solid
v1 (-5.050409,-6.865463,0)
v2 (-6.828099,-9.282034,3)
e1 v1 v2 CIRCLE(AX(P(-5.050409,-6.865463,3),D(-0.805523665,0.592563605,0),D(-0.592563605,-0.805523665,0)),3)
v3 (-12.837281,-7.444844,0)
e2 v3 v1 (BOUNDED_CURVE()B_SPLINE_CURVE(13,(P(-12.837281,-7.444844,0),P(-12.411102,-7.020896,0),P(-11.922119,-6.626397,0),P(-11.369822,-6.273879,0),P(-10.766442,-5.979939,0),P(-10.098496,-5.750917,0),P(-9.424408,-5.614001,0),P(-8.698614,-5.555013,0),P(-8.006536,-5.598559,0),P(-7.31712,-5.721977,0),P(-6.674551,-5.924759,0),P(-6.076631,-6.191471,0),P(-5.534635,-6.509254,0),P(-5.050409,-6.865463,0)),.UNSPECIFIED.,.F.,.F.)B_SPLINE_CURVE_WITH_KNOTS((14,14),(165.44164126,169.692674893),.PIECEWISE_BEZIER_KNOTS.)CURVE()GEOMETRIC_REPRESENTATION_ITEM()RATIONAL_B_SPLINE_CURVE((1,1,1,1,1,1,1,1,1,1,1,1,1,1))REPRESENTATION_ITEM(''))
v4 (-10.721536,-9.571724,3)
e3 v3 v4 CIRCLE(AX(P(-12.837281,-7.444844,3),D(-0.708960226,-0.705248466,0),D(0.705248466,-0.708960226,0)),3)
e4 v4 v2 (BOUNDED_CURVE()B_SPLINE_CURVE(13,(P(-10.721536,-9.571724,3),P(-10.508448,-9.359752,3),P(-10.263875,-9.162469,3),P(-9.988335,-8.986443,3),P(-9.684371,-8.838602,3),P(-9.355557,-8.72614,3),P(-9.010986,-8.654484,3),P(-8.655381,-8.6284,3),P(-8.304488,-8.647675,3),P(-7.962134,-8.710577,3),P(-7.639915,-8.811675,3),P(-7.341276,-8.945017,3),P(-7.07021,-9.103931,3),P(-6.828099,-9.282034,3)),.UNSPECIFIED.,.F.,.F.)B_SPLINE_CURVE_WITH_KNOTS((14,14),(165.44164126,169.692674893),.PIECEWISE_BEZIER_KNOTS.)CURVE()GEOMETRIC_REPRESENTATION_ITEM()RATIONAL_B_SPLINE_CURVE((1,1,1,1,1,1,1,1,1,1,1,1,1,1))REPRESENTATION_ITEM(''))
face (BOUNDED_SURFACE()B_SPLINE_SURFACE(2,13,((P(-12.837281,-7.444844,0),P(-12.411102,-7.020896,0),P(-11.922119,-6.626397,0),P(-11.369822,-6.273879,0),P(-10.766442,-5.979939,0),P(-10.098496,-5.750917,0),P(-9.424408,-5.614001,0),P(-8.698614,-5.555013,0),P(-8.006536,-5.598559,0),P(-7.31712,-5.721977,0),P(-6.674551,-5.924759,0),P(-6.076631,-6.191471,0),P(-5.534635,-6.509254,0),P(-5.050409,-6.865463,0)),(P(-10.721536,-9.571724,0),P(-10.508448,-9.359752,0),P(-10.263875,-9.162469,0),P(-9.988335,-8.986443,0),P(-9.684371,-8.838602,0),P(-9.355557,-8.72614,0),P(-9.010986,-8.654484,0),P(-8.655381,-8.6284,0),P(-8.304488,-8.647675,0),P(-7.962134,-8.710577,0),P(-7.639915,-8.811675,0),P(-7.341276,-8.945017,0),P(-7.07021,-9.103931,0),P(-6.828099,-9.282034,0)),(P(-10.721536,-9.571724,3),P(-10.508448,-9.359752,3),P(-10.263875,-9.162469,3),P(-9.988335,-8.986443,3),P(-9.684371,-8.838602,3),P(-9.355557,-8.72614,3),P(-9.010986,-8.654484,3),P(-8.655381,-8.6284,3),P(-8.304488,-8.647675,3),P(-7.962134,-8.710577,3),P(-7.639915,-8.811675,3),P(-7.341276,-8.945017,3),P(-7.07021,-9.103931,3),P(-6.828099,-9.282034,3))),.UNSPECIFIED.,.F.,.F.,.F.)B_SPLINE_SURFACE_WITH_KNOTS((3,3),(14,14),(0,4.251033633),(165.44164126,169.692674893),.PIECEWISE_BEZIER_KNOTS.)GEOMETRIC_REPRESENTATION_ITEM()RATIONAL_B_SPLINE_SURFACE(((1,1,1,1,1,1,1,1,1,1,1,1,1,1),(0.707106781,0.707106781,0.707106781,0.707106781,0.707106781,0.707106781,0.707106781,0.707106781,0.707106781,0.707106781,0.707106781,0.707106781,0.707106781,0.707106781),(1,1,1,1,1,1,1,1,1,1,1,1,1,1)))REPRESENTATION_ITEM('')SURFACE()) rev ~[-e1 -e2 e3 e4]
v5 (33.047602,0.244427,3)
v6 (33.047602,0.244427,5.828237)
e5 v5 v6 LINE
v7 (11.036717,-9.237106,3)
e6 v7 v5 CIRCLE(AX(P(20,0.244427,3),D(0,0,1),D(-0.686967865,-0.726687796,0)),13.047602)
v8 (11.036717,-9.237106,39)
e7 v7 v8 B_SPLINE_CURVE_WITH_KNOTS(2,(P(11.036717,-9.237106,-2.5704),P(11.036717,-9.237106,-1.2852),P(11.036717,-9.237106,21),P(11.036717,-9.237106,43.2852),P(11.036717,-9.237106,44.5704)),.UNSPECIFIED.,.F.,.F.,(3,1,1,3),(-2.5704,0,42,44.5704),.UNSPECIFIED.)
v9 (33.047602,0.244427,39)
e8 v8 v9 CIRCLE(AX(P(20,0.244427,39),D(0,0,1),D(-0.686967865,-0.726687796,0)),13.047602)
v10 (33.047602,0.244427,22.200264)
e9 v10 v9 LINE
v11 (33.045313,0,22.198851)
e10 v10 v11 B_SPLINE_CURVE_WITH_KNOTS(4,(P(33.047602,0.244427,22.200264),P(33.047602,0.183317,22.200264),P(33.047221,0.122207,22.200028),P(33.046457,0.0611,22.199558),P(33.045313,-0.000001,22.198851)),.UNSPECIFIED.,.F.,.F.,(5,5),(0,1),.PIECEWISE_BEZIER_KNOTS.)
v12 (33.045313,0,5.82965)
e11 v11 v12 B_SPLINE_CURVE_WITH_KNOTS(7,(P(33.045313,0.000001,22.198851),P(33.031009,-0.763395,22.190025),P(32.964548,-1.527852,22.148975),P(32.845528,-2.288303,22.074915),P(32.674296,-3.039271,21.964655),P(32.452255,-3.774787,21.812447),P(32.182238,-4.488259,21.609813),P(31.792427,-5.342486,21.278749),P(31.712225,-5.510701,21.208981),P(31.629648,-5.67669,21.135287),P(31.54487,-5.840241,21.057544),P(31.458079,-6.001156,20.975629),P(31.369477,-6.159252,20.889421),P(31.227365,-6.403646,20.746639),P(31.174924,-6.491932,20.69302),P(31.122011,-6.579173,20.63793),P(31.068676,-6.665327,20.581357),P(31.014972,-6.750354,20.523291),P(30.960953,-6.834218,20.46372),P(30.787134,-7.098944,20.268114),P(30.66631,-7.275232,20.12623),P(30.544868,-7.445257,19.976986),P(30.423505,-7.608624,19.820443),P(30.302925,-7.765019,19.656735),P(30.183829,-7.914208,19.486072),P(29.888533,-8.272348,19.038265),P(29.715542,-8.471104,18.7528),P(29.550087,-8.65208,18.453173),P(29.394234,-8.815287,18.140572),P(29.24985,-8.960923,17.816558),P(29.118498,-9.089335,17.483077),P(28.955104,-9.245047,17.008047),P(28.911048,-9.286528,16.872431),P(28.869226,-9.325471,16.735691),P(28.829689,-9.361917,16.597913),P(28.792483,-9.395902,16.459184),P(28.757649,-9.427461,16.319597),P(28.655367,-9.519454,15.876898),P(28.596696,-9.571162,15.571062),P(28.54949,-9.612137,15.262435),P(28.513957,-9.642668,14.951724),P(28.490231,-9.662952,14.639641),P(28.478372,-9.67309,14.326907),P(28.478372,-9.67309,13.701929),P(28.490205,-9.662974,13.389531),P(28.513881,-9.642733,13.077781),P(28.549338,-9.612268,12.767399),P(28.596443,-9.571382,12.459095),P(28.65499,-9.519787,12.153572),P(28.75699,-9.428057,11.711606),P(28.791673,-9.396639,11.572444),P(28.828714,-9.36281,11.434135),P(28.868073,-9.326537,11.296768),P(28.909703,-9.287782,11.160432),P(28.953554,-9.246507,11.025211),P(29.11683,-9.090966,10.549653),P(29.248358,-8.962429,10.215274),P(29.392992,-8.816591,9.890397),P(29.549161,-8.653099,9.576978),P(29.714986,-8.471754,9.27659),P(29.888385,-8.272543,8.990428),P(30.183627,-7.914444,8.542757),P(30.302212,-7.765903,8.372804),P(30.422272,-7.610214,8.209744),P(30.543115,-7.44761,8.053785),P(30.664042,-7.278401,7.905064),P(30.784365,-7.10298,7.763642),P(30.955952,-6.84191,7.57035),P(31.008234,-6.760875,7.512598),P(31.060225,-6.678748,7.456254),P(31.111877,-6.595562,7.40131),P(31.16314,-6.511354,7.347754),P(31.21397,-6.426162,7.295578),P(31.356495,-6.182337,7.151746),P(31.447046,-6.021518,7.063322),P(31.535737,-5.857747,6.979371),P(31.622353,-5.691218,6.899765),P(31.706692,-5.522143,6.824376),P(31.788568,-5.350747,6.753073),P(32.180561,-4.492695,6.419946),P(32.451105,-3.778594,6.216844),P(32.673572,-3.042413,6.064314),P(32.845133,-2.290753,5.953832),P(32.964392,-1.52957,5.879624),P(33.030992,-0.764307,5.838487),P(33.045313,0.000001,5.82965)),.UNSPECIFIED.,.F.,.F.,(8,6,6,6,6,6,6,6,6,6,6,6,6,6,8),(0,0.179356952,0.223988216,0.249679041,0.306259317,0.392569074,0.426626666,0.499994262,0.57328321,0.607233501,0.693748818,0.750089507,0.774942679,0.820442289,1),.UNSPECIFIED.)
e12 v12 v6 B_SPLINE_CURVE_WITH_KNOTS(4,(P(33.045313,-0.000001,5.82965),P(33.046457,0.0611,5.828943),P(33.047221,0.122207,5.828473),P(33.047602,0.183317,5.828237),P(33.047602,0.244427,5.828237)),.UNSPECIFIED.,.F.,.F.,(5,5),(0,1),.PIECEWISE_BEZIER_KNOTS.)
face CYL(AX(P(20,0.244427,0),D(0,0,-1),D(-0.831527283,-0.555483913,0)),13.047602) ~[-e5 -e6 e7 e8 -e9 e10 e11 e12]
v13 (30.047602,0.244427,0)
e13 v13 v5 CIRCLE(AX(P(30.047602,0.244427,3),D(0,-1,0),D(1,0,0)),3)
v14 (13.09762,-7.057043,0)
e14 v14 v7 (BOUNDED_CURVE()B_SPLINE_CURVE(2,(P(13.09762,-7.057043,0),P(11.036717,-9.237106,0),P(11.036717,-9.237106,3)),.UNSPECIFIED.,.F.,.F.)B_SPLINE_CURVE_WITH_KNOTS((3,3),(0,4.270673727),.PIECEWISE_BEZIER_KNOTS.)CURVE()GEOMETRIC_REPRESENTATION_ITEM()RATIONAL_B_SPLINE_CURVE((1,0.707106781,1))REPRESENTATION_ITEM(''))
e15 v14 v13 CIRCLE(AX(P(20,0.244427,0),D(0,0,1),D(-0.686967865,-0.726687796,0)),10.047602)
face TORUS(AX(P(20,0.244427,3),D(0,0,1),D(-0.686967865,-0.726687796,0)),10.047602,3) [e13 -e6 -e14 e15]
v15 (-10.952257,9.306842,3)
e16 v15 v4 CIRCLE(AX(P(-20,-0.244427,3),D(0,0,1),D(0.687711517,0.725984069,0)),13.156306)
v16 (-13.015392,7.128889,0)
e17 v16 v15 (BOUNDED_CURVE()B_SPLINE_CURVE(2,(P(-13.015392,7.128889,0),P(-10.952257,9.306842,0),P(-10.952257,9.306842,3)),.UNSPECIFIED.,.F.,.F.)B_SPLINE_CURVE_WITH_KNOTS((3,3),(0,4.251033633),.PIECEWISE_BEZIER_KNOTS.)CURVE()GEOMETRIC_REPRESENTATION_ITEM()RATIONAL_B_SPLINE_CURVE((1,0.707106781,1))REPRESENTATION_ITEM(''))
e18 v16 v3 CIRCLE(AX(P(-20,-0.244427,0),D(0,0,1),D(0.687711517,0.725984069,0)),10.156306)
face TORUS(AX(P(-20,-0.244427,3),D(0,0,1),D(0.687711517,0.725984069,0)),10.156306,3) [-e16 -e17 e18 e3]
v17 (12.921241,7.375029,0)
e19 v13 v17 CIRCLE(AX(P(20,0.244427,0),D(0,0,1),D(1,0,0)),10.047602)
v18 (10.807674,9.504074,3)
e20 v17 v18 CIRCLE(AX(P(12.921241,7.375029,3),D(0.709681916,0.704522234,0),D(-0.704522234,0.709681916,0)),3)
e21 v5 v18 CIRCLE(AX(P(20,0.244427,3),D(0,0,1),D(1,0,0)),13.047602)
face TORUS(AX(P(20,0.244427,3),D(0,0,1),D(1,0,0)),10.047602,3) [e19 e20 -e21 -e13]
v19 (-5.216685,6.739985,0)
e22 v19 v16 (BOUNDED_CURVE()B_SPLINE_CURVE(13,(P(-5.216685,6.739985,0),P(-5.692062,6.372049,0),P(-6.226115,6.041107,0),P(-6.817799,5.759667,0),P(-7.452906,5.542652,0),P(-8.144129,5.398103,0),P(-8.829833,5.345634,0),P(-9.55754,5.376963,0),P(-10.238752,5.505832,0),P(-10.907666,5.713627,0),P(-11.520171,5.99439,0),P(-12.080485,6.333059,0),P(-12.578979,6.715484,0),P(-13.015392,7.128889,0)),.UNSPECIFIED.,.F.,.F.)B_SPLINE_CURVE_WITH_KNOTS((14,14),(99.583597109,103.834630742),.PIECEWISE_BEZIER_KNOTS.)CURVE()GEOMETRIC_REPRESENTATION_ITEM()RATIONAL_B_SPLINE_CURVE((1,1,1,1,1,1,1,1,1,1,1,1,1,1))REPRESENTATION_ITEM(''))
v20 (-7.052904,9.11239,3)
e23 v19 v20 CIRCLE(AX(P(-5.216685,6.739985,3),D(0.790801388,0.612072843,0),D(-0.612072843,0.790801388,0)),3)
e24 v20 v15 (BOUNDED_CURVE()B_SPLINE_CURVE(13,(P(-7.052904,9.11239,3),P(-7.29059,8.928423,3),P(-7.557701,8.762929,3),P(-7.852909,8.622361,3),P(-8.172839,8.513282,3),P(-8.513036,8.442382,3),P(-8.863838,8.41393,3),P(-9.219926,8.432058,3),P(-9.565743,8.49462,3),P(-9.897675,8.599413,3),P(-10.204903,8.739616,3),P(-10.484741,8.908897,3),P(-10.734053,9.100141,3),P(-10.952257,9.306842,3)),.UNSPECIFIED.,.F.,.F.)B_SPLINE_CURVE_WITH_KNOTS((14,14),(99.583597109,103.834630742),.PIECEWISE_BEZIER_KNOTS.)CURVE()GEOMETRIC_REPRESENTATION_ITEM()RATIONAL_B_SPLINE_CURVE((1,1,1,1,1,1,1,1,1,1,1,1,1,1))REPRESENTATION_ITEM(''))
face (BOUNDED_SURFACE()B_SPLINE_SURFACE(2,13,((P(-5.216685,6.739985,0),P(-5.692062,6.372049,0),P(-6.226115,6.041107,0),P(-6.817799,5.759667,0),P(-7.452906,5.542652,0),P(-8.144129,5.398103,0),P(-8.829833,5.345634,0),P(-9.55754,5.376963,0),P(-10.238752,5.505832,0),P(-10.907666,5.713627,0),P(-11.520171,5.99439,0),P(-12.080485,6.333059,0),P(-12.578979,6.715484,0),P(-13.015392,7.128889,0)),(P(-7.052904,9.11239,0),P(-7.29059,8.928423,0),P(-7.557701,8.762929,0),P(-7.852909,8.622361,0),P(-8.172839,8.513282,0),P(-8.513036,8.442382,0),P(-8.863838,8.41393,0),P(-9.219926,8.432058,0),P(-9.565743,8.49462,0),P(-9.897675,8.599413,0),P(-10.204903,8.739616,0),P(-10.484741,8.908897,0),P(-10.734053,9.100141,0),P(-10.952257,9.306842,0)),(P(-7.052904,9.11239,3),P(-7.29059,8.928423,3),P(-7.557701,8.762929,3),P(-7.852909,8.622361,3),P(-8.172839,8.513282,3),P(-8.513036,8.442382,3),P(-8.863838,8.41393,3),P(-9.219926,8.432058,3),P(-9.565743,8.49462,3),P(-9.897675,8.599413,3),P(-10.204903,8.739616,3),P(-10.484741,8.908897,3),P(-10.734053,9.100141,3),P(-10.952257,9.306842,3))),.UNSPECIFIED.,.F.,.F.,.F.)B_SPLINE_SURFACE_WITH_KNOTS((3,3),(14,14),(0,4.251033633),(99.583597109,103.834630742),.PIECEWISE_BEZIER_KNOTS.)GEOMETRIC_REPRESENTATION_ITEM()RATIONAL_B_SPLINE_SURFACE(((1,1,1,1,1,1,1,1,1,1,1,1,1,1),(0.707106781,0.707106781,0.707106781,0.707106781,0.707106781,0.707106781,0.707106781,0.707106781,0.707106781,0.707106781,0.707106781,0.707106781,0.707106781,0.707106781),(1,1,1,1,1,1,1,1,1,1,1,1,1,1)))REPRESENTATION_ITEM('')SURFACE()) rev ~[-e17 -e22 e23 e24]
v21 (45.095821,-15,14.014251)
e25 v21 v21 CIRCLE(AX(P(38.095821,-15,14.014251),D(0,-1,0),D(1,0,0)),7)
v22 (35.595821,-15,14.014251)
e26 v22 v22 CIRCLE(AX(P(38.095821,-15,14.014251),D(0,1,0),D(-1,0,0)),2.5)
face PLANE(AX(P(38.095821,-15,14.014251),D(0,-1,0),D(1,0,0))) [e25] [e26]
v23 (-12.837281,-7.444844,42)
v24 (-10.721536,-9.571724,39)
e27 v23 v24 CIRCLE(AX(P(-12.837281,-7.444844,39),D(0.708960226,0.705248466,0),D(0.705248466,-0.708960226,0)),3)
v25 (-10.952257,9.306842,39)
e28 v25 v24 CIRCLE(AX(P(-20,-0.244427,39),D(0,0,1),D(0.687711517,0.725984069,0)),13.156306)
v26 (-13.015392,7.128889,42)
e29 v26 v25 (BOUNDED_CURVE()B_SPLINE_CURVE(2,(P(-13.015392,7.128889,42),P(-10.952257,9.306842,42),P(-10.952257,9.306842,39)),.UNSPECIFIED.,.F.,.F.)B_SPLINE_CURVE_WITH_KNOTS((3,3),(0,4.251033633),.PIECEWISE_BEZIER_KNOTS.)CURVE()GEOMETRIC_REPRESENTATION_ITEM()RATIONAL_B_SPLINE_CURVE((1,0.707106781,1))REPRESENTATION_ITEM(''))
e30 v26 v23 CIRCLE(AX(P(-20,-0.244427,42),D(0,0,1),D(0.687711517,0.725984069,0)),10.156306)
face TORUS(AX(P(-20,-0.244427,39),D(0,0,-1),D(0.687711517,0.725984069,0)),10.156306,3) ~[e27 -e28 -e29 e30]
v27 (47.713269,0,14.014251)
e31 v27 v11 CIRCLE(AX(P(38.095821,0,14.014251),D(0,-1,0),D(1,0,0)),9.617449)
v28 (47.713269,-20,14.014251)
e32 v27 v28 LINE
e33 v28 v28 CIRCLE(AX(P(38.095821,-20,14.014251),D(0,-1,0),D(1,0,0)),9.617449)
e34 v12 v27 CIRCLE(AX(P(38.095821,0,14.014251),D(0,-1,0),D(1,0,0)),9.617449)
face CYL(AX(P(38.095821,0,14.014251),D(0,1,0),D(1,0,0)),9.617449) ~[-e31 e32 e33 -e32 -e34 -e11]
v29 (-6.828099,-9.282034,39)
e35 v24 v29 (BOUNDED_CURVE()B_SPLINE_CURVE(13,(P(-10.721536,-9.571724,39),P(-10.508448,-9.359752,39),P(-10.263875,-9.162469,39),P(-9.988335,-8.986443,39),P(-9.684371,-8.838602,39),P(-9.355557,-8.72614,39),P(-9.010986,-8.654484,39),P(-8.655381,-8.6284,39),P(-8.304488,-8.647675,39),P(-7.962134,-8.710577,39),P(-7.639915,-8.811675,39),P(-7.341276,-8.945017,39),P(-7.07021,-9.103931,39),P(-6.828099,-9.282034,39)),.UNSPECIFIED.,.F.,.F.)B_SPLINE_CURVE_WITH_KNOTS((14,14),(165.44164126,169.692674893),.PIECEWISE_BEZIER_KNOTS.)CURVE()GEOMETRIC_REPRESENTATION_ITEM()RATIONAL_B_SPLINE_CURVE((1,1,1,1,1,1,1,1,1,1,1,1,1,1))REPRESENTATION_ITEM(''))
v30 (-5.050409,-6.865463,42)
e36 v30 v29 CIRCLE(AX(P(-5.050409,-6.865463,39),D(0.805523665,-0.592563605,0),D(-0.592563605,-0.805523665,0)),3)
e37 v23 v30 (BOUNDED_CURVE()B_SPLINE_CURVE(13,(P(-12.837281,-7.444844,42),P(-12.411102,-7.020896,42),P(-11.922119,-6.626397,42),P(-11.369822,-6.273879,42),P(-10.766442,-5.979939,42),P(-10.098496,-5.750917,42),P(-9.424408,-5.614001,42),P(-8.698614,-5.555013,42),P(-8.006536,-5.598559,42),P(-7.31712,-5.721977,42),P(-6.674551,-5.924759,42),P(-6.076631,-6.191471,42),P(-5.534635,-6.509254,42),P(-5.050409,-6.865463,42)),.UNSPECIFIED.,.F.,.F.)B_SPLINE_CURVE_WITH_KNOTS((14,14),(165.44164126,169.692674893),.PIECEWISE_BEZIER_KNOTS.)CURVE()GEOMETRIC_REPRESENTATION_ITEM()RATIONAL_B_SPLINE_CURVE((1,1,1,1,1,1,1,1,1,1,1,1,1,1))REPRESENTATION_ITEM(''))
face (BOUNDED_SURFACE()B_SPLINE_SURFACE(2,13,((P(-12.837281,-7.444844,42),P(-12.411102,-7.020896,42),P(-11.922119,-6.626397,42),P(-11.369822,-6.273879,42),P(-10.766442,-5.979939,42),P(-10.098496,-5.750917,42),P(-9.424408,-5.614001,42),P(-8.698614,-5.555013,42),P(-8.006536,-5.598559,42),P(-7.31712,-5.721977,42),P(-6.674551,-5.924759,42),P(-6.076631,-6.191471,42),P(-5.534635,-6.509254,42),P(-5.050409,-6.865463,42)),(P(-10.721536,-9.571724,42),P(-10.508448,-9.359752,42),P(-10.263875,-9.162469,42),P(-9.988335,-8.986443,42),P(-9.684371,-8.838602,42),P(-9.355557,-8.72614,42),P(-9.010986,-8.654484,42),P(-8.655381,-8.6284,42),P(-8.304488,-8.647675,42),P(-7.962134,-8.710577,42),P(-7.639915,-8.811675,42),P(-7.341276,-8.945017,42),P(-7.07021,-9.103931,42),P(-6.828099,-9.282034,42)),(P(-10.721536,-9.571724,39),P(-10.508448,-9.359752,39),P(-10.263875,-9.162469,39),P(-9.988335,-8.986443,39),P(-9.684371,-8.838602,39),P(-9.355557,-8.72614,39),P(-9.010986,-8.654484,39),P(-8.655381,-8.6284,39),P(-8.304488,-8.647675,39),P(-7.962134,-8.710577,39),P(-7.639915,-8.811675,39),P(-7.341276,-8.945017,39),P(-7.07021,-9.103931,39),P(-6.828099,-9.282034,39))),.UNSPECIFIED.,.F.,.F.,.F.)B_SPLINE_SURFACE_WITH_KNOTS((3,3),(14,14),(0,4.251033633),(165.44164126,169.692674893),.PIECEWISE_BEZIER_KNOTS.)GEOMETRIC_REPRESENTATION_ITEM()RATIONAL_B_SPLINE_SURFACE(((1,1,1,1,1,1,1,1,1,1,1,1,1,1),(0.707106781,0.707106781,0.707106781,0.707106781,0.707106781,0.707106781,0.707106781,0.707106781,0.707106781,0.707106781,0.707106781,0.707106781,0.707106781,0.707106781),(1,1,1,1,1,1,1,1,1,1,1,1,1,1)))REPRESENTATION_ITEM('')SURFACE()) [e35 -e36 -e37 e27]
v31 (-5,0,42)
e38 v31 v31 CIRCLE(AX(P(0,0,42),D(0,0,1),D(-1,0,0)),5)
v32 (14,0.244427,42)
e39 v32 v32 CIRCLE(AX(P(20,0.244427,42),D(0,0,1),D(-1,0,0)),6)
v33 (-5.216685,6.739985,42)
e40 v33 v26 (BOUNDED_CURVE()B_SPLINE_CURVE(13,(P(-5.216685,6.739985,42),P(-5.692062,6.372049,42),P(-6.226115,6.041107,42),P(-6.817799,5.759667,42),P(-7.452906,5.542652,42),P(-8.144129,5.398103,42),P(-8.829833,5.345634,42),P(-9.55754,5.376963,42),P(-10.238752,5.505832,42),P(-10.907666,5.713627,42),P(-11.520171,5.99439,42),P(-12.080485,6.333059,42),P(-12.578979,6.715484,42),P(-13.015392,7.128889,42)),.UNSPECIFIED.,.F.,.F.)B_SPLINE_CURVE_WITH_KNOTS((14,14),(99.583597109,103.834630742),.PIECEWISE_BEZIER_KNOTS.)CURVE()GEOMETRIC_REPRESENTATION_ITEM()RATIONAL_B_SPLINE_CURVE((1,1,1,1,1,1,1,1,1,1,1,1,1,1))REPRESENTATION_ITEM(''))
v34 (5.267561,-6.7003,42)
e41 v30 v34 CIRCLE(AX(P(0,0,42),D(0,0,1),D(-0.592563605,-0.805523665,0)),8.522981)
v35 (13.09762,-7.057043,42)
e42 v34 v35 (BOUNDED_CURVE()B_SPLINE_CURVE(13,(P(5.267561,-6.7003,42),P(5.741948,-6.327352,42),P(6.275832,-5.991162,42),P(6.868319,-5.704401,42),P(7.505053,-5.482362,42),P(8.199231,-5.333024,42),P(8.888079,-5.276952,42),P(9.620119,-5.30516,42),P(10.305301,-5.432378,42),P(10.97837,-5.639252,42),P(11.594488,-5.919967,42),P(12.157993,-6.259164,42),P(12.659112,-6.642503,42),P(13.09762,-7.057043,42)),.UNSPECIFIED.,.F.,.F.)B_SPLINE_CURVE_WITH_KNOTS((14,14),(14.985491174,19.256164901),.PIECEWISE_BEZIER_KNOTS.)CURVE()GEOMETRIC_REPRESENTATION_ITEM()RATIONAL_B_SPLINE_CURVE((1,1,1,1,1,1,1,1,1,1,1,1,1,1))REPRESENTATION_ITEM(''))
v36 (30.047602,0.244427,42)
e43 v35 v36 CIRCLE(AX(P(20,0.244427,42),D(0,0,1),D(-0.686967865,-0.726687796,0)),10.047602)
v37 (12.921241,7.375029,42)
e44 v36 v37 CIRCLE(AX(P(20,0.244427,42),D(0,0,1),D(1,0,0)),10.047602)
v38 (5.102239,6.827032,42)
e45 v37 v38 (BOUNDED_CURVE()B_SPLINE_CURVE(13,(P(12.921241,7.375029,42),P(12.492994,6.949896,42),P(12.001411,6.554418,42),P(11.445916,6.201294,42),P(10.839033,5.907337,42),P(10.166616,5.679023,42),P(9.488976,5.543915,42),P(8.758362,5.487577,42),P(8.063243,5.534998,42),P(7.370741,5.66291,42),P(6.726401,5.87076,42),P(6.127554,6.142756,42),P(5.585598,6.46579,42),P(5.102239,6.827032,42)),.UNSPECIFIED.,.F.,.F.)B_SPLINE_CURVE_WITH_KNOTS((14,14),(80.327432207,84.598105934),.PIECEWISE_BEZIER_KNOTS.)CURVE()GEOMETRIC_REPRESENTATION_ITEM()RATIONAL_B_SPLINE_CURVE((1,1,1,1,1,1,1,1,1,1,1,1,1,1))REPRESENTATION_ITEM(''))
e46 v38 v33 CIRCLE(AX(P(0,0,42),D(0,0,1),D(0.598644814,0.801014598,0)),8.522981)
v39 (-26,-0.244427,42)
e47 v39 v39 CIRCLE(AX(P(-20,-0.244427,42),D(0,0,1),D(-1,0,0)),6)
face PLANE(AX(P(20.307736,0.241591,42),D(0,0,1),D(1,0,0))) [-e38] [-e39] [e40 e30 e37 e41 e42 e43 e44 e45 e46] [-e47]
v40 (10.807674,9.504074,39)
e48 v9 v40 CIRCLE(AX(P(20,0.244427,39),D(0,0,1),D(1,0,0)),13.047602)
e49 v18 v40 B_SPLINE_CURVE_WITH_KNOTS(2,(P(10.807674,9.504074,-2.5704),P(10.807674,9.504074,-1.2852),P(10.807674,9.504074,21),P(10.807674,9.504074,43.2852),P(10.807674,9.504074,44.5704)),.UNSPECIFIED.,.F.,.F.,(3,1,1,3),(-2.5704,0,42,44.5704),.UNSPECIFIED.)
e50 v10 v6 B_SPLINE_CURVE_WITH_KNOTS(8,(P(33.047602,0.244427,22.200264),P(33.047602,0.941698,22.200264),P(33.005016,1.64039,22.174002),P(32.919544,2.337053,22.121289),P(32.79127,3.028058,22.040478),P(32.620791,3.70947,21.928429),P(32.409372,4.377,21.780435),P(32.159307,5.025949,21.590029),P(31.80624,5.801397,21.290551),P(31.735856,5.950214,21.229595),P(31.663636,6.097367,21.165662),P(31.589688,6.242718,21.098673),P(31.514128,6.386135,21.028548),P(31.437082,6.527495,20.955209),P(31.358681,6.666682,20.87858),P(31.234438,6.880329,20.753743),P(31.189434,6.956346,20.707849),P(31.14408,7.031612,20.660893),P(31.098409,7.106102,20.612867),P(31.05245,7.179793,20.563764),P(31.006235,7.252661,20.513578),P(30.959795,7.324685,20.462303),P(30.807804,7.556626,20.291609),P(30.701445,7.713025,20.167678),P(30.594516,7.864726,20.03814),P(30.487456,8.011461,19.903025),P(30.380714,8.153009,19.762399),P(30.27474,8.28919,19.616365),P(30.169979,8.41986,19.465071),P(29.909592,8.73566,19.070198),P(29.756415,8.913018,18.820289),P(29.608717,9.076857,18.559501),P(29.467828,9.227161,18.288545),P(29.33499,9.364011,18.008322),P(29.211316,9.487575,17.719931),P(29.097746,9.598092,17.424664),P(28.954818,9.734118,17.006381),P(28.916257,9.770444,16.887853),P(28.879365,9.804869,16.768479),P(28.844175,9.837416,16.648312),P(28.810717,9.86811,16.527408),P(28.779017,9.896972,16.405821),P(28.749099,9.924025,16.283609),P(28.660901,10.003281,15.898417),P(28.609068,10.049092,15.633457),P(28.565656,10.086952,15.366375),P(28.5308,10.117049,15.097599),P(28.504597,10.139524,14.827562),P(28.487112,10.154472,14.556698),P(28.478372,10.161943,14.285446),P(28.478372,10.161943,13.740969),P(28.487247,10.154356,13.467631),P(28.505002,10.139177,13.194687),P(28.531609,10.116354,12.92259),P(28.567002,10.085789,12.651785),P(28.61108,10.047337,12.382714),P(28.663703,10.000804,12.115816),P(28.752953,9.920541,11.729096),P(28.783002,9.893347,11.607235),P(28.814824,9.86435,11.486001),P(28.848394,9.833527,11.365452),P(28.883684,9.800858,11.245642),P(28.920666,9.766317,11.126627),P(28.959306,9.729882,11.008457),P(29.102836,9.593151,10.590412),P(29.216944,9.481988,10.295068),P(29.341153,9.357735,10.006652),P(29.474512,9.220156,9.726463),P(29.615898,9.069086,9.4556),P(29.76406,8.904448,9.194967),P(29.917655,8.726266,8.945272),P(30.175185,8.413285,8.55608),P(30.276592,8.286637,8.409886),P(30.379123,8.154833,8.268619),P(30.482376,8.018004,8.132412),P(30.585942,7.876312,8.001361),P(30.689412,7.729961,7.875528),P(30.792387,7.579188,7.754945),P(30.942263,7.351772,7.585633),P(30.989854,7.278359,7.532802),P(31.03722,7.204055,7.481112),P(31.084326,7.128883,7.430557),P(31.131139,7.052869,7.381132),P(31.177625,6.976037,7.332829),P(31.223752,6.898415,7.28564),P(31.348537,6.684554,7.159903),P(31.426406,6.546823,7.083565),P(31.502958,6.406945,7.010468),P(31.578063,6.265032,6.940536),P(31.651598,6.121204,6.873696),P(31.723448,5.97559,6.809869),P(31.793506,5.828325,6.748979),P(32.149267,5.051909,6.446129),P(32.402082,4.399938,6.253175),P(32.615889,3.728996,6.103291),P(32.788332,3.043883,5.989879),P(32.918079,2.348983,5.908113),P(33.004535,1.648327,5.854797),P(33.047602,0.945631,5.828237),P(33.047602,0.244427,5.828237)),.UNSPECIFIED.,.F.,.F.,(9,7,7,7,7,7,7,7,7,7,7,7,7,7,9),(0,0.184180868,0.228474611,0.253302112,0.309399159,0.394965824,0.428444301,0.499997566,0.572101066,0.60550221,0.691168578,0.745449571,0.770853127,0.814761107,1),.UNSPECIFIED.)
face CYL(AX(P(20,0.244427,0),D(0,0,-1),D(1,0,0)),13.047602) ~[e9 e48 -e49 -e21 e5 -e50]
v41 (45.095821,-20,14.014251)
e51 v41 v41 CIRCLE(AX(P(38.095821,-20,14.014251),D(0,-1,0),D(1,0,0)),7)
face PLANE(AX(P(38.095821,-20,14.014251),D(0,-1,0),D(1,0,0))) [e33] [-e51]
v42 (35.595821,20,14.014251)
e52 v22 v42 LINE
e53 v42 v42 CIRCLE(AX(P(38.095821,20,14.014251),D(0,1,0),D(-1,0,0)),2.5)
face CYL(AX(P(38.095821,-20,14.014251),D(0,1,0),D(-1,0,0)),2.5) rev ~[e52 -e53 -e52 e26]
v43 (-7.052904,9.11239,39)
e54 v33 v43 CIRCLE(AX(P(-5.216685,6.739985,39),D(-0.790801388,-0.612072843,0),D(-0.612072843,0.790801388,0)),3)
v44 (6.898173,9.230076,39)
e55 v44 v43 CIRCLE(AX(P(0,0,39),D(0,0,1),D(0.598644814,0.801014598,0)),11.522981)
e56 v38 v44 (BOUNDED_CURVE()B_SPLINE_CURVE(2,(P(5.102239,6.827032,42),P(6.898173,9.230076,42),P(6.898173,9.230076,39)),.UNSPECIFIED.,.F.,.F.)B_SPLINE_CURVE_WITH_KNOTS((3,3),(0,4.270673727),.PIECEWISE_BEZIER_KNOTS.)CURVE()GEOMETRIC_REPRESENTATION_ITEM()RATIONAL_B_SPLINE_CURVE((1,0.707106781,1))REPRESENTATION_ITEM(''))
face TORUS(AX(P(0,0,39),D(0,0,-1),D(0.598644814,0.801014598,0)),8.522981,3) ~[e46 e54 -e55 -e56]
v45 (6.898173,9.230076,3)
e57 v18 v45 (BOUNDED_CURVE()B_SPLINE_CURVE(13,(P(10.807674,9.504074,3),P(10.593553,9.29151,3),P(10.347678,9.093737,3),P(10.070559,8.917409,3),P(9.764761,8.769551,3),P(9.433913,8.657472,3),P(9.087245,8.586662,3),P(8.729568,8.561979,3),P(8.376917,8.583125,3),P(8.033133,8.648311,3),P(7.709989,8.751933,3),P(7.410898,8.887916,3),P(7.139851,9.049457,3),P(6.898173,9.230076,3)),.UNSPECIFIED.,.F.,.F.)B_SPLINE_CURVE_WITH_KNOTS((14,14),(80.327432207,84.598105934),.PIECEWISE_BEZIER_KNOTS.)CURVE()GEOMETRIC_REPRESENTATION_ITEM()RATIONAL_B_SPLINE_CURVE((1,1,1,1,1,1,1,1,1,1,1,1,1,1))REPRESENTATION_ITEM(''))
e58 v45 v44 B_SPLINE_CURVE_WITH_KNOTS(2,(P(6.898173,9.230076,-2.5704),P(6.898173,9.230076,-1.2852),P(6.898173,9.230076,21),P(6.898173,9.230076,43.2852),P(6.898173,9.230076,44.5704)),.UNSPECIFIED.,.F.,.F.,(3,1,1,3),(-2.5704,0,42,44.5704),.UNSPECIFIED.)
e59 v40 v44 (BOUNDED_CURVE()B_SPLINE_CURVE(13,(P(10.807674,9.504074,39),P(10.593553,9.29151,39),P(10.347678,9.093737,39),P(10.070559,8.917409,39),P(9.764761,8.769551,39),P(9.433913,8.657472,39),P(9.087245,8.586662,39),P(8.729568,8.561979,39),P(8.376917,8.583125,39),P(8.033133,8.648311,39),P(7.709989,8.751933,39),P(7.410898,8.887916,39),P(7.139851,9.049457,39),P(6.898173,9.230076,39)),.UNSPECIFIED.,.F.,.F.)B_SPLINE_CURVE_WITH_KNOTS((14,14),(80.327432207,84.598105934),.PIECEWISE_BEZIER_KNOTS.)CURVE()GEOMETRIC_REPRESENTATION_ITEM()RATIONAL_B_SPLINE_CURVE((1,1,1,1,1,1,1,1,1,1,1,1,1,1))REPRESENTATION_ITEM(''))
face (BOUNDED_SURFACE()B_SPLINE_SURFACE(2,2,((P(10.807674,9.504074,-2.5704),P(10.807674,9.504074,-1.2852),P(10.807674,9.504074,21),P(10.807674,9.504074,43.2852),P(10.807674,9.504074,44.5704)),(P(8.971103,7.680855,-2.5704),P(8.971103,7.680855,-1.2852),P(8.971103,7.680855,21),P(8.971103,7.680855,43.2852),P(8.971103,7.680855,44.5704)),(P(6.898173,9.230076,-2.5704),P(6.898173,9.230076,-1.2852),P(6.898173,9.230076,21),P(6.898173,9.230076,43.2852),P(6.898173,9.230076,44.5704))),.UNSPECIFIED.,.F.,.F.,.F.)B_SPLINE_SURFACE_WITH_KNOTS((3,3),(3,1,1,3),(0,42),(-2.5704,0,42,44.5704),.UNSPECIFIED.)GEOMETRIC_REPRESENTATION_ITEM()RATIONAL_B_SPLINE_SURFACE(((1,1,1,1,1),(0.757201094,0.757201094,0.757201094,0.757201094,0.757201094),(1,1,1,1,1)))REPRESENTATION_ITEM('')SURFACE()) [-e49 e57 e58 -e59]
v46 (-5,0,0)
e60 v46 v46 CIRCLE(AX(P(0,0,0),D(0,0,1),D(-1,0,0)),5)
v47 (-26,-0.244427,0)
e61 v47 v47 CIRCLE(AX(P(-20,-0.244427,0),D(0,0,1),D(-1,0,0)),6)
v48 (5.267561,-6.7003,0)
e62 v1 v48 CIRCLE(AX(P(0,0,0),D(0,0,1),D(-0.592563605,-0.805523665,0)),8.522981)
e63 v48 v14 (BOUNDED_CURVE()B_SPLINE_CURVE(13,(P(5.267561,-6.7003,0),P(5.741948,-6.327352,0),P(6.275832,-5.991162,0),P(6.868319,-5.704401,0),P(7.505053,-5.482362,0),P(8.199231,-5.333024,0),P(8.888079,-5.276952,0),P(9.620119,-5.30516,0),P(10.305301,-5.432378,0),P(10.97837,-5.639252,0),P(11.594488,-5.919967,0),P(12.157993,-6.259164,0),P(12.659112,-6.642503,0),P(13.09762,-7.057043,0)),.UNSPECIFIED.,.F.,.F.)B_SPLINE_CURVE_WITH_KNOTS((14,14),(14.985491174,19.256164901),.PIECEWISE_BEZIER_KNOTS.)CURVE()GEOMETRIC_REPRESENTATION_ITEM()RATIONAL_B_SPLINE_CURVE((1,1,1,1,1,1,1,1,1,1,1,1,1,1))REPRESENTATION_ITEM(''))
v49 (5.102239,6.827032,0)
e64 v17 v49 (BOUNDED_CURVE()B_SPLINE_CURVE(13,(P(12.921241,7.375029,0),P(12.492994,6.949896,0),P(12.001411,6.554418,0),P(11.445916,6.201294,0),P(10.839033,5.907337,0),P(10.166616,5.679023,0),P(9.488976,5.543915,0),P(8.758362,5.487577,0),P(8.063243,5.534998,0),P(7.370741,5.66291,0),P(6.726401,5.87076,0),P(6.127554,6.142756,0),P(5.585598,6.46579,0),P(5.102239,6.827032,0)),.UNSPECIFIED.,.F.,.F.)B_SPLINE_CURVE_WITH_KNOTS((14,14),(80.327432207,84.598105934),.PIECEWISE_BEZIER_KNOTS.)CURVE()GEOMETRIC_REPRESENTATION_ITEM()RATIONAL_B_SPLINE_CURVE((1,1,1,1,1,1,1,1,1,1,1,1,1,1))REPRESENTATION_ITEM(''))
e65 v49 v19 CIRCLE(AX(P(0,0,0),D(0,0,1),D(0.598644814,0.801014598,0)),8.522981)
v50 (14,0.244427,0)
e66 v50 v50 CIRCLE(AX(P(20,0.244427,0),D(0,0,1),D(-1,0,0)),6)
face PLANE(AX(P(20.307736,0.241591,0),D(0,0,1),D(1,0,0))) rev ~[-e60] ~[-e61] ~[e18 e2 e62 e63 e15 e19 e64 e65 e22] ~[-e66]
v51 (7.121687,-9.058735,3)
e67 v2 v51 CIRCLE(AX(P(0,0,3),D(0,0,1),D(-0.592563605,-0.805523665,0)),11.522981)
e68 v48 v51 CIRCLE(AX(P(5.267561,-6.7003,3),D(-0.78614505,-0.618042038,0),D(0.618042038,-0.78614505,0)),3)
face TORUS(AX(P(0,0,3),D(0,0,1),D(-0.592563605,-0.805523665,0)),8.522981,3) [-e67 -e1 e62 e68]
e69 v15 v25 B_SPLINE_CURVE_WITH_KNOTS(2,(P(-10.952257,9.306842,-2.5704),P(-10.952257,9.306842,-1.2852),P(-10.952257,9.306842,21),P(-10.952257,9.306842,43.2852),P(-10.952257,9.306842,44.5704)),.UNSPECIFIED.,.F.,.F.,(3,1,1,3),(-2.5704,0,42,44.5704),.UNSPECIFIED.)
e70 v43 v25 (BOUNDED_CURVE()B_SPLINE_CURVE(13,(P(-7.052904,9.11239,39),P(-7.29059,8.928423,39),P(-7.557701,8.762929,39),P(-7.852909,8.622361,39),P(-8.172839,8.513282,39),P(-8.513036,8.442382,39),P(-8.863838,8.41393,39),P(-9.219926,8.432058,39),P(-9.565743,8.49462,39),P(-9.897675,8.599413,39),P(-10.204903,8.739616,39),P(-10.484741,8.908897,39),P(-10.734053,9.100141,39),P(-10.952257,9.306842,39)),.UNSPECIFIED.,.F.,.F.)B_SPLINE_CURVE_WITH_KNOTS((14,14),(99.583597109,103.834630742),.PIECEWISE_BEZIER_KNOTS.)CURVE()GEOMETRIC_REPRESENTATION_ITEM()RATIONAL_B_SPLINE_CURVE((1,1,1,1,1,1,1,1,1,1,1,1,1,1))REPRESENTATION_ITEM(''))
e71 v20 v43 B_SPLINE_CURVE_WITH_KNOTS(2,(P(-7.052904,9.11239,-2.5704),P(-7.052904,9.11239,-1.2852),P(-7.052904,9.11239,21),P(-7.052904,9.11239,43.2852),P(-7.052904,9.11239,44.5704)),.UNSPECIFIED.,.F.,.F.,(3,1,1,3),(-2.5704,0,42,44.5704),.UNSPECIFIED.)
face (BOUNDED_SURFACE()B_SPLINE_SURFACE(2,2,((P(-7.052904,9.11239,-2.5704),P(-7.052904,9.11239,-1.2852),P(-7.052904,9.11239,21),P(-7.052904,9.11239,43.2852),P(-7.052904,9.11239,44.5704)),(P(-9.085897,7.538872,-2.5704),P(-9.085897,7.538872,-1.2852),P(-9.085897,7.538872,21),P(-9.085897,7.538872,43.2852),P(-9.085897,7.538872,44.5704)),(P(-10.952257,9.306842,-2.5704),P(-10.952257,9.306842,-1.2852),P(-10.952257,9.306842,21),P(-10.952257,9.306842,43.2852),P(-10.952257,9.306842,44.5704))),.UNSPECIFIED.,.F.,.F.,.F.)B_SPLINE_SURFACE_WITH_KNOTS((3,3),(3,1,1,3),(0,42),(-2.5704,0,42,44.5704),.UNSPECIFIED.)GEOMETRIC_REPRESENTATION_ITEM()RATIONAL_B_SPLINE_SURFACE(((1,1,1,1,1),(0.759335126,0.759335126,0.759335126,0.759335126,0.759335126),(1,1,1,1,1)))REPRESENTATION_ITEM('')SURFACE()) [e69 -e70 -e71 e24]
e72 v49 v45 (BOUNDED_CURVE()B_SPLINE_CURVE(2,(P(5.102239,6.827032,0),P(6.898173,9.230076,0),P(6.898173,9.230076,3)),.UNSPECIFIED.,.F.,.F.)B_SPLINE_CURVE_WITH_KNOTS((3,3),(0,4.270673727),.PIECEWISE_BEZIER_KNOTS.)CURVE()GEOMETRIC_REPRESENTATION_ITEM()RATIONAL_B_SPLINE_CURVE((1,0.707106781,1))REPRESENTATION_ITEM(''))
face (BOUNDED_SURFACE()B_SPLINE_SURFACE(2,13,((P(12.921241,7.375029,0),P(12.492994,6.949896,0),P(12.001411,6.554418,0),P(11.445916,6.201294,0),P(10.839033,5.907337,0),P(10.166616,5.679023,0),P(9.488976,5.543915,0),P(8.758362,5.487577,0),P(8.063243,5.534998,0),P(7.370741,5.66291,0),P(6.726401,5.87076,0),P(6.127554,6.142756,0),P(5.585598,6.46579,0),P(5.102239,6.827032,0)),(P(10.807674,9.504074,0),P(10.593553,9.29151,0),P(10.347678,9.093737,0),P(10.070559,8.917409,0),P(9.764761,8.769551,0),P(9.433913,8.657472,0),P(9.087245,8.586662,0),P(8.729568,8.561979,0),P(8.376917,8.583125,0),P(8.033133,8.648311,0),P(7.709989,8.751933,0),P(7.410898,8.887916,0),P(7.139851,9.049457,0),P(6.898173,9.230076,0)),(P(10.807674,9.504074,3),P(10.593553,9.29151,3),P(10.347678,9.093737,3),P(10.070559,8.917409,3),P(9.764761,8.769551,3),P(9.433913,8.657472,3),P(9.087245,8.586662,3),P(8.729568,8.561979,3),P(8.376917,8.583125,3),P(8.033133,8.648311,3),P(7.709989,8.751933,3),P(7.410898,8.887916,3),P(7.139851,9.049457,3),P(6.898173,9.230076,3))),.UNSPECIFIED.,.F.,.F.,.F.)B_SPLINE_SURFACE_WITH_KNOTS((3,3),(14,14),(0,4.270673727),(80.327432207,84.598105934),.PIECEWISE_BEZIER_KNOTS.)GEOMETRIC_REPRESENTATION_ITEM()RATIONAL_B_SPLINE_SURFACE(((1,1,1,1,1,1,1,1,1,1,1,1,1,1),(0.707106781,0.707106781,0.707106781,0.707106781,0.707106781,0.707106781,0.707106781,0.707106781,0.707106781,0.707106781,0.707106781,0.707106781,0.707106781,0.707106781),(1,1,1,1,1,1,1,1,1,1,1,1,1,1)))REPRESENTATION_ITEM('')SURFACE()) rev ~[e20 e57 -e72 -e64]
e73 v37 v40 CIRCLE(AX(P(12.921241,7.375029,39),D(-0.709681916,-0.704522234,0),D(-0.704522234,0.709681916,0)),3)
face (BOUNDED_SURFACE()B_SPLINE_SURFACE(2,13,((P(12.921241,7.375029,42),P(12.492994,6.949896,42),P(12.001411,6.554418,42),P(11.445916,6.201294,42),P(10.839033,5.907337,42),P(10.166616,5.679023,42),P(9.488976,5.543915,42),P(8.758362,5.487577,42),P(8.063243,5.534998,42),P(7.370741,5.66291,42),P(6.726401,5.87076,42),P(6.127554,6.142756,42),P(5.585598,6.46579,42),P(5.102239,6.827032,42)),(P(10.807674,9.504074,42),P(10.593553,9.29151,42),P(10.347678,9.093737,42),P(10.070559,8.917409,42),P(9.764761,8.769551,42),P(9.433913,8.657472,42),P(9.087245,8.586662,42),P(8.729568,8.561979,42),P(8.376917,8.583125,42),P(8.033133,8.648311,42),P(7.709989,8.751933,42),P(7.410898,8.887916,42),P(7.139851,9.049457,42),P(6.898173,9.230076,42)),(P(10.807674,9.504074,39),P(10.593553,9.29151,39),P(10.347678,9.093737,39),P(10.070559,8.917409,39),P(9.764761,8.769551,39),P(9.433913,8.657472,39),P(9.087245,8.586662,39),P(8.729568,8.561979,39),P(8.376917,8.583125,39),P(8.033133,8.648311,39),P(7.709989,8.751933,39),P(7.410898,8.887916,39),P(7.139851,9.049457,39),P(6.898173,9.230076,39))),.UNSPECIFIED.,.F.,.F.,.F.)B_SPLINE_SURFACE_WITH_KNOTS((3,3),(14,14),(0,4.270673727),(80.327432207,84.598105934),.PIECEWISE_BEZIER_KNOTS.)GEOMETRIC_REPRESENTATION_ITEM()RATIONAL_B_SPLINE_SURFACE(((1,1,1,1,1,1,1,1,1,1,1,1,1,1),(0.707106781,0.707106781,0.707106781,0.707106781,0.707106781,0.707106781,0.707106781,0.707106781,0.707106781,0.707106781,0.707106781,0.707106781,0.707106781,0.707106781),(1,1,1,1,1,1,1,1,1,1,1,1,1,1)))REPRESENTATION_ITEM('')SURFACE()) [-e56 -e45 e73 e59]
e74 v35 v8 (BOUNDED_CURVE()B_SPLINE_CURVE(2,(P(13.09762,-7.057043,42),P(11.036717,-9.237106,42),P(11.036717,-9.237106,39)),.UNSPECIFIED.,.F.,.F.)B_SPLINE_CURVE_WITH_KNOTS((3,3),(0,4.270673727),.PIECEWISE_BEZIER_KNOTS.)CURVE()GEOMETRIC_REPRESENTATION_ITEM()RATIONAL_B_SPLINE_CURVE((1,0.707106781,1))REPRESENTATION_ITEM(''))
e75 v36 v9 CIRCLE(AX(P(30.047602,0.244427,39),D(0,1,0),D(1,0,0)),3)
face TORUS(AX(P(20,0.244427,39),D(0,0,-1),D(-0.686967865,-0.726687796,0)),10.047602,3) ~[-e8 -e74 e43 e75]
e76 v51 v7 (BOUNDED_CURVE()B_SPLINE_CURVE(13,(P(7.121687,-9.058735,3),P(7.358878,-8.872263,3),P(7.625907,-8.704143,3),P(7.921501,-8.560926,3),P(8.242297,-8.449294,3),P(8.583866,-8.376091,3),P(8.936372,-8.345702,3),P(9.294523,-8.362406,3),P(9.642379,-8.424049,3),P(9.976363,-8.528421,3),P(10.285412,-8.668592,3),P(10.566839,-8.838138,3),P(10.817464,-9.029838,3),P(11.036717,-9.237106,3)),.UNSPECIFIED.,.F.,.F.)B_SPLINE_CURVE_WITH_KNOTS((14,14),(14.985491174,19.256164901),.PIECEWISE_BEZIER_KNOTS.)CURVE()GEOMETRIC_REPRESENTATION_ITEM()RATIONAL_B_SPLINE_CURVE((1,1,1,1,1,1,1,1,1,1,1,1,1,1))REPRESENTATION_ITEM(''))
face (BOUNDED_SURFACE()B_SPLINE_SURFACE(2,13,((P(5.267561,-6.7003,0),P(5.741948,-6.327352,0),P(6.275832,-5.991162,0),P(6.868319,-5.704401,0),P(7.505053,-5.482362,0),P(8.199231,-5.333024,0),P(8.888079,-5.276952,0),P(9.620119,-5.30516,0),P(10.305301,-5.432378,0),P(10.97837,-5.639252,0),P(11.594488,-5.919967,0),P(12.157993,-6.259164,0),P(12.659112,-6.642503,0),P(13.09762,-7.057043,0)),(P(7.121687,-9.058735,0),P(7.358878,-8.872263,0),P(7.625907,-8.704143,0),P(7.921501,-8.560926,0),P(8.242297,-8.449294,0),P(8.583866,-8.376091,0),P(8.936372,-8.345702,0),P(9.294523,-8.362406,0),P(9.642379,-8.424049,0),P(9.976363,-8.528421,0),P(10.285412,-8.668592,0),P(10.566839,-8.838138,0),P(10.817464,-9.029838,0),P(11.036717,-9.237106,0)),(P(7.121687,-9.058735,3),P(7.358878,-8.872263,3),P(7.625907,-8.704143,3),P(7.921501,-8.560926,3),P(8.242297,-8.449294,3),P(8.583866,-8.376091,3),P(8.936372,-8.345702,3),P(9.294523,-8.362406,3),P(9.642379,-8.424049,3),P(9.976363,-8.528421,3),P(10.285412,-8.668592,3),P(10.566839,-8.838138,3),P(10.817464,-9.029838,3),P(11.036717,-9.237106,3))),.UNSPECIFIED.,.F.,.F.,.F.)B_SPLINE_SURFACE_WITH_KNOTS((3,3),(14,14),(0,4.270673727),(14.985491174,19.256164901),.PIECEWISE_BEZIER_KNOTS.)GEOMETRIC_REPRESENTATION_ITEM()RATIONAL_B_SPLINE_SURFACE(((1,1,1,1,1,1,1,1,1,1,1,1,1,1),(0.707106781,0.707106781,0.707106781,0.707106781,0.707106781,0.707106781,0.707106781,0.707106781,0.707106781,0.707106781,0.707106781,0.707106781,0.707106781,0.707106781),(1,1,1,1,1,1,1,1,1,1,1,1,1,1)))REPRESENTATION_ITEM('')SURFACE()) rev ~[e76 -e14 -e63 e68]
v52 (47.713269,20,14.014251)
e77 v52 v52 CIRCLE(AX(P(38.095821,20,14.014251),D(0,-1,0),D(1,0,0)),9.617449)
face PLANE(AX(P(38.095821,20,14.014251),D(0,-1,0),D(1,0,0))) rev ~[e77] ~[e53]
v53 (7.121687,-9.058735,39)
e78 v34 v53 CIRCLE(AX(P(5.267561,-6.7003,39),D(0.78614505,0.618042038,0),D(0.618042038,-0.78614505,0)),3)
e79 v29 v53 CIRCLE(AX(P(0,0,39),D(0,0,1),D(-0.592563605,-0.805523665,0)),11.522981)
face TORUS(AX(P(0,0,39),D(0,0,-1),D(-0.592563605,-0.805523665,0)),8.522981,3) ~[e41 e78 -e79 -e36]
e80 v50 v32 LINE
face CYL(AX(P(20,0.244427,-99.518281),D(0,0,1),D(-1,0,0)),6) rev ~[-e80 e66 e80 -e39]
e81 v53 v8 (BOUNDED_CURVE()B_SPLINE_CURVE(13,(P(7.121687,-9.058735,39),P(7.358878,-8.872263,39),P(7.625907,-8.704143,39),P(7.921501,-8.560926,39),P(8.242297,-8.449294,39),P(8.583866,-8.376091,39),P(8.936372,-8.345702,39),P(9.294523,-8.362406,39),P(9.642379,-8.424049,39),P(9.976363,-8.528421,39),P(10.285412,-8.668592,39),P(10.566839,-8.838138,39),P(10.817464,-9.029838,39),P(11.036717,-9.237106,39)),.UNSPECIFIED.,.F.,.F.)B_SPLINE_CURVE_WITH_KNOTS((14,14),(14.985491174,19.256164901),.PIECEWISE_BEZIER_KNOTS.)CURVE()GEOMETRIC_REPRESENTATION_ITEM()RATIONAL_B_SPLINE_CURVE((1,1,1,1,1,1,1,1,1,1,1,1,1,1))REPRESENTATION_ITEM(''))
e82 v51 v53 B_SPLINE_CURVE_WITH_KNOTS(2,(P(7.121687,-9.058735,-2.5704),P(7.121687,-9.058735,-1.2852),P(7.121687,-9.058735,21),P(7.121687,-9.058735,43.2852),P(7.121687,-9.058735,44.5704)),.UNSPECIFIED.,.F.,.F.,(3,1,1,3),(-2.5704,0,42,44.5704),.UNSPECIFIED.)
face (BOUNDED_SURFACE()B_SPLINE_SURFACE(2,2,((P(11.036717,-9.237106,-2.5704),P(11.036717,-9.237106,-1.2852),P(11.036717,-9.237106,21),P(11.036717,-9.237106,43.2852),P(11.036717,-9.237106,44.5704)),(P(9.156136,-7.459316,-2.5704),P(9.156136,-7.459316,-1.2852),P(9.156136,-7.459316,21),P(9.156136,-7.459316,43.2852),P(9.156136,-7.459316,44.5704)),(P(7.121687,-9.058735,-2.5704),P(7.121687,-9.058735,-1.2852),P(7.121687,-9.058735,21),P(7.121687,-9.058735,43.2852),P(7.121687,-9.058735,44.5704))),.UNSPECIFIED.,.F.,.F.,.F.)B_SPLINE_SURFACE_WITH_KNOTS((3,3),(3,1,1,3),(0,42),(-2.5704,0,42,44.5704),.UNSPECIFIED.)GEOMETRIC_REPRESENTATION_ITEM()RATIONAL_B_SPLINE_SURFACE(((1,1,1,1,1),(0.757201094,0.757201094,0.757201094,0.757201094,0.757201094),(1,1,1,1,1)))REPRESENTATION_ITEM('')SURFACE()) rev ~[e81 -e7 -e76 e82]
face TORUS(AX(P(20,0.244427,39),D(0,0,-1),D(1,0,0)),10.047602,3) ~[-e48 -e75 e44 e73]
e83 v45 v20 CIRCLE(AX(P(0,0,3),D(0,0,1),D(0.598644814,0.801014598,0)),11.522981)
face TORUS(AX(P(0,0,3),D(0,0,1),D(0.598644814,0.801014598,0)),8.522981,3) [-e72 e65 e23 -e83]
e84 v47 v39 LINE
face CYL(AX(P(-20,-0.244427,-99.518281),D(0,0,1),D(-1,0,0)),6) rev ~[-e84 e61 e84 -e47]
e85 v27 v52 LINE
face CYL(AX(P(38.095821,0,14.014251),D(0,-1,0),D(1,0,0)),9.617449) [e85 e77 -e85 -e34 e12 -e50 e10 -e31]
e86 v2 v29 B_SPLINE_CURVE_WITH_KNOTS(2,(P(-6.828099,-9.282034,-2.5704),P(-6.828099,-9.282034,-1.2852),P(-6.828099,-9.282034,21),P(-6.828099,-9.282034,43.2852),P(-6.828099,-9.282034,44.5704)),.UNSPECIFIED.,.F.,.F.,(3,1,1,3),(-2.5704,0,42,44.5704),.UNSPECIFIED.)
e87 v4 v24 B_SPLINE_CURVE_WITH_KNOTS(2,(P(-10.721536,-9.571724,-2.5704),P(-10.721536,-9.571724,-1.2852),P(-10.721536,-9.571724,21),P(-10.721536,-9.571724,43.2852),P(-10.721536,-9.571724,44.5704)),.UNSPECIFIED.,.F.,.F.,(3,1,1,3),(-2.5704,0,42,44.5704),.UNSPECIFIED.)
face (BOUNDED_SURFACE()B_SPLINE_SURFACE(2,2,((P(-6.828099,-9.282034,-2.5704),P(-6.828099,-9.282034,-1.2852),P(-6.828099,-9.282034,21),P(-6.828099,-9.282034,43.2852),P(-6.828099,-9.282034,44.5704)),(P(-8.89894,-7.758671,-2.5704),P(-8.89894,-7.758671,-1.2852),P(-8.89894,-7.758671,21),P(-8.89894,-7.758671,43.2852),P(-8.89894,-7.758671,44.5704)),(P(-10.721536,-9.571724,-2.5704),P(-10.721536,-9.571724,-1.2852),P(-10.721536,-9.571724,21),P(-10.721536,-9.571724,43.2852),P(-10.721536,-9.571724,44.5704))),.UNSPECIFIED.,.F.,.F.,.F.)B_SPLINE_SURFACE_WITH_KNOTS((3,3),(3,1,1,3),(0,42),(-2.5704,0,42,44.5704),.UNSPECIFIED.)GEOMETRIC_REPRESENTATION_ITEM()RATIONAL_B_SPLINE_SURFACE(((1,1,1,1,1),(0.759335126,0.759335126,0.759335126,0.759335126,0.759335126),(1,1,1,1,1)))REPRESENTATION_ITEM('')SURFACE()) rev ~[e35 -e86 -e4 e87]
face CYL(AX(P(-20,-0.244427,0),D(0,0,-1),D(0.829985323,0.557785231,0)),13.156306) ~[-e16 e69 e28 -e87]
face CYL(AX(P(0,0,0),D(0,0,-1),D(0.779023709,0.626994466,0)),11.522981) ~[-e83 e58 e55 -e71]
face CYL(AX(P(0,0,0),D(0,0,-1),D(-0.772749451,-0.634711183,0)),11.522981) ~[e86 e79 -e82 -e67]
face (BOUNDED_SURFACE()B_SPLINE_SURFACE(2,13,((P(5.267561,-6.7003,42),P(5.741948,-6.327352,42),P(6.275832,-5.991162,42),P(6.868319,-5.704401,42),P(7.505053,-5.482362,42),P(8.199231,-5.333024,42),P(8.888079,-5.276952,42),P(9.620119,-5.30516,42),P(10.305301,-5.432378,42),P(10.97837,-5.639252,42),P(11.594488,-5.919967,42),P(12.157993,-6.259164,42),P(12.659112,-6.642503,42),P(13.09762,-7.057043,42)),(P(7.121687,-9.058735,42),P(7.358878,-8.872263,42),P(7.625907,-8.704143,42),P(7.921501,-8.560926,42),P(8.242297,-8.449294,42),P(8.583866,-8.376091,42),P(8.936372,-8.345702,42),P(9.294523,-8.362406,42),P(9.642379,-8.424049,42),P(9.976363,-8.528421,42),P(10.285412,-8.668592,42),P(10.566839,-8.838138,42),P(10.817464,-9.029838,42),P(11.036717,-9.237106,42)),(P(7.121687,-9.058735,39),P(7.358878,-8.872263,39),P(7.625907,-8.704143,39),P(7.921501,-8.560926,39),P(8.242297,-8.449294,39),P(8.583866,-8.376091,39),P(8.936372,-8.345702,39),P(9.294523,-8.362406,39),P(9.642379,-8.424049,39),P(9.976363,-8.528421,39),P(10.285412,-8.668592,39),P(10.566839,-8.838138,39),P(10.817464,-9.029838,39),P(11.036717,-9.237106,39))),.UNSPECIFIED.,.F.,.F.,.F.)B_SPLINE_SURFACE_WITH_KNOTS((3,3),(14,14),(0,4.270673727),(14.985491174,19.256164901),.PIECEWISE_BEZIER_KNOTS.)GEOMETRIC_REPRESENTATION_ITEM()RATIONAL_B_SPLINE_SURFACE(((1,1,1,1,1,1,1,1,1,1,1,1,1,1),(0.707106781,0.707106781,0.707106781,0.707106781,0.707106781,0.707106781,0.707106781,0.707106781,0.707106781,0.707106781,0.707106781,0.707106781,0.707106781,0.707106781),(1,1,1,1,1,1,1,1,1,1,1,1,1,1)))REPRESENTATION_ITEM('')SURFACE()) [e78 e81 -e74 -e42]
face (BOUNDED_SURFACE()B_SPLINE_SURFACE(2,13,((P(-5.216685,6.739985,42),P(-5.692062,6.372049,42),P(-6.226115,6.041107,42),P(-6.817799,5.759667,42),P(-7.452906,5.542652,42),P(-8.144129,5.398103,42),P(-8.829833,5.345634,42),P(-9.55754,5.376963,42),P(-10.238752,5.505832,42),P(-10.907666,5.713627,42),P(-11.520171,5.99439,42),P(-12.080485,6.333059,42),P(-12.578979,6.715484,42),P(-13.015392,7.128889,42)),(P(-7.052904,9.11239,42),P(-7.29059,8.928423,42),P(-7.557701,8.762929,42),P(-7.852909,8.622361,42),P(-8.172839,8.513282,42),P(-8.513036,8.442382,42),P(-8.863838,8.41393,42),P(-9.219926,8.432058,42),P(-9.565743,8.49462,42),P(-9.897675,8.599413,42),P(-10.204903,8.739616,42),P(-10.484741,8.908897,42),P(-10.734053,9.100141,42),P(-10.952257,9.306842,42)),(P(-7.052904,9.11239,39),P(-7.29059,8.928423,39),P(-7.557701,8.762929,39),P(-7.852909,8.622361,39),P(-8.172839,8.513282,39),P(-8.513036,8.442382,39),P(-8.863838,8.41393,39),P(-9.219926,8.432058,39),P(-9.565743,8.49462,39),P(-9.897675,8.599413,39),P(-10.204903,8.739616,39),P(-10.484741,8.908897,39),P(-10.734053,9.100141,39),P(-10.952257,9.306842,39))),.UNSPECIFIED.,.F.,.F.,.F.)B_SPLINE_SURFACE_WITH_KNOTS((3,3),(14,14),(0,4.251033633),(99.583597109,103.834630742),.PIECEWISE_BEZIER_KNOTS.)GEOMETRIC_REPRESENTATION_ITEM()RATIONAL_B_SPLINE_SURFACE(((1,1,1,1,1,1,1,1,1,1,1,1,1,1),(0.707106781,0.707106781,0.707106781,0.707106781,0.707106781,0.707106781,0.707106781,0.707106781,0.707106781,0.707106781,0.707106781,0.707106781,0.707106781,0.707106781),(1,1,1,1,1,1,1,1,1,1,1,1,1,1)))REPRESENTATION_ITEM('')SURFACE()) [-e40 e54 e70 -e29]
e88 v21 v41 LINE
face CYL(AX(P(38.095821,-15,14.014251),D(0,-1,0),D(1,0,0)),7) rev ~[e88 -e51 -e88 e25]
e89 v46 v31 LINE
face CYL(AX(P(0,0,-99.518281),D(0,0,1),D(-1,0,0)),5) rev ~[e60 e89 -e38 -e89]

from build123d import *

# Parameters (mm, degrees)
F1_DEPTH       = 42
F2_R           = 9.6174487521
F3_DEPTH       = 20
F4_DEPTH       = 20
F5_D           = 12
F6_D           = 10
F8_D           = 5
F8_CBORE_D     = 14
F8_CBORE_DEPTH = 5
F9_F1_R        = 3
F9_F2_R        = 3


# Not quite as in the source:
# - a feature names something its author has since deleted; it is built from what else it names


with BuildPart() as f1:
    # F0 (on Top) → F1 (new body)
    with BuildSketch(Plane.XY):
        with BuildLine():
            ThreePointArc((9.1505627454, -7.0033062659), (23.7868709109, -12.2415465763), (33.0476022533, 0.2444268846))
            ThreePointArc((33.0476022533, 0.2444268846), (23.6340041516, 12.7757451866), (8.9766756052, 7.2248454857))
            ThreePointArc((8.9766756052, 7.2248454857), (10.8677771882, 3.8302109864), (11.5229812641, 0))
            ThreePointArc((11.5229812641, 0), (10.9137724982, -3.6971160477), (9.1505627454, -7.0033062659))
        make_face()
        with BuildLine():
            ThreePointArc((11.5229812641, 0), (10.8677771882, 3.8302109864), (8.9766756052, 7.2248454857))
            ThreePointArc((8.9766756052, 7.2248454857), (6.9533720407, 0.0849795533), (9.1505627454, -7.0033062659))
            ThreePointArc((9.1505627454, -7.0033062659), (10.9137724982, -3.6971160477), (11.5229812641, 0))
        make_face()
        with BuildLine():
            ThreePointArc((9.1505627454, -7.0033062659), (6.9533720407, 0.0849795533), (8.9766756052, 7.2248454857))
            ThreePointArc((8.9766756052, 7.2248454857), (-0.0835171314, 11.5226785992), (-9.0804592928, 7.0939661858))
            ThreePointArc((-9.0804592928, 7.0939661858), (-7.415302968, 3.5914280039), (-6.8436942073, -0.2444268846))
            ThreePointArc((-6.8436942073, -0.2444268846), (-7.3693668934, -3.9262049114), (-8.9043774496, -7.3137650665))
            ThreePointArc((-8.9043774496, -7.3137650665), (0.1981109959, -11.5212781082), (9.1505627454, -7.0033062659))
        make_face()
        with BuildLine():
            ThreePointArc((-6.8436942073, -0.2444268846), (-7.415302968, 3.5914280039), (-9.0804592928, 7.0939661858))
            ThreePointArc((-9.0804592928, 7.0939661858), (-11.522120817, -0.1408158047), (-8.9043774496, -7.3137650665))
            ThreePointArc((-8.9043774496, -7.3137650665), (-7.3693668934, -3.9262049114), (-6.8436942073, -0.2444268846))
        make_face()
        with BuildLine():
            ThreePointArc((-8.9043774496, -7.3137650665), (-11.522120817, -0.1408158047), (-9.0804592928, 7.0939661858))
            ThreePointArc((-9.0804592928, 7.0939661858), (-33.1553233816, -0.40520262), (-8.9043774496, -7.3137650665))
        make_face()
    extrude(amount=F1_DEPTH)

    # F2 (on Front) → F3 (join)
    with BuildSketch(Plane.XZ):
        with Locations((38.0958206952, 14.0142505988)):
            Circle(F2_R)
    extrude(amount=F3_DEPTH)

    # F2 (on Front) → F4 (join)
    with BuildSketch(Plane.XZ):
        with Locations((38.0958206952, 14.0142505988)):
            Circle(F2_R)
    extrude(amount=-F4_DEPTH)

    # F5 (through all)
    with Locations(Plane(origin=(0, 0, 0), x_dir=(1, 0, 0), z_dir=(0, 0, -1))):
        with Locations((-20, 0.2444268846), (20, -0.2444268846)):
            Hole(F5_D / 2)

    # F6 (through all)
    with Locations(Plane(origin=(0, 0, 0), x_dir=(1, 0, 0), z_dir=(0, 0, -1))):
        with Locations((0, 0)):
            Hole(F6_D / 2)

    # F8 (through all)
    with Locations(Plane.XZ.offset(20)):
        with Locations((38.0958206952, 14.0142505988)):
            CounterBoreHole(F8_D / 2, F8_CBORE_D / 2, F8_CBORE_DEPTH)

    # F9: fillet of radius 3 on 8 edges, made by hand

    # F9_f1
    f9_f1_edges = [f1.edges().sort_by_distance(p)[0] for p in [
        (-8.9043774496, -7.3137650665, 21),
        (9.1505627454, -7.0033062659, 21),
        (8.9766756052, 7.2248454857, 21),
        (-9.0804592928, 7.0939661858, 21),
    ]]
    fillet(f9_f1_edges, radius=F9_F1_R)

    # F9_f2
    f9_f2_edges = [f1.edges().sort_by_distance(p)[0] for p in [
        (0.1844290224, -11.5215052466, 0),
        (0.1844290224, -11.5215052466, 42),
        (-0.0972005694, 11.5225712956, 0),
        (-0.0972005694, 11.5225712956, 42),
        (8.9038484363, 8.6404608623, 42),
        (-9.0385400019, 8.4885169801, 42),
        (8.9038484363, 8.6404608623, 0),
        (-9.0385400019, 8.4885169801, 0),
        (-8.8283891992, -8.7068748722, 42),
        (9.112353607, -8.4202786555, 42),
        (-8.8283891992, -8.7068748722, 0),
        (9.112353607, -8.4202786555, 0),
    ]]
    fillet(f9_f2_edges, radius=F9_F2_R)


solid = f1.part
